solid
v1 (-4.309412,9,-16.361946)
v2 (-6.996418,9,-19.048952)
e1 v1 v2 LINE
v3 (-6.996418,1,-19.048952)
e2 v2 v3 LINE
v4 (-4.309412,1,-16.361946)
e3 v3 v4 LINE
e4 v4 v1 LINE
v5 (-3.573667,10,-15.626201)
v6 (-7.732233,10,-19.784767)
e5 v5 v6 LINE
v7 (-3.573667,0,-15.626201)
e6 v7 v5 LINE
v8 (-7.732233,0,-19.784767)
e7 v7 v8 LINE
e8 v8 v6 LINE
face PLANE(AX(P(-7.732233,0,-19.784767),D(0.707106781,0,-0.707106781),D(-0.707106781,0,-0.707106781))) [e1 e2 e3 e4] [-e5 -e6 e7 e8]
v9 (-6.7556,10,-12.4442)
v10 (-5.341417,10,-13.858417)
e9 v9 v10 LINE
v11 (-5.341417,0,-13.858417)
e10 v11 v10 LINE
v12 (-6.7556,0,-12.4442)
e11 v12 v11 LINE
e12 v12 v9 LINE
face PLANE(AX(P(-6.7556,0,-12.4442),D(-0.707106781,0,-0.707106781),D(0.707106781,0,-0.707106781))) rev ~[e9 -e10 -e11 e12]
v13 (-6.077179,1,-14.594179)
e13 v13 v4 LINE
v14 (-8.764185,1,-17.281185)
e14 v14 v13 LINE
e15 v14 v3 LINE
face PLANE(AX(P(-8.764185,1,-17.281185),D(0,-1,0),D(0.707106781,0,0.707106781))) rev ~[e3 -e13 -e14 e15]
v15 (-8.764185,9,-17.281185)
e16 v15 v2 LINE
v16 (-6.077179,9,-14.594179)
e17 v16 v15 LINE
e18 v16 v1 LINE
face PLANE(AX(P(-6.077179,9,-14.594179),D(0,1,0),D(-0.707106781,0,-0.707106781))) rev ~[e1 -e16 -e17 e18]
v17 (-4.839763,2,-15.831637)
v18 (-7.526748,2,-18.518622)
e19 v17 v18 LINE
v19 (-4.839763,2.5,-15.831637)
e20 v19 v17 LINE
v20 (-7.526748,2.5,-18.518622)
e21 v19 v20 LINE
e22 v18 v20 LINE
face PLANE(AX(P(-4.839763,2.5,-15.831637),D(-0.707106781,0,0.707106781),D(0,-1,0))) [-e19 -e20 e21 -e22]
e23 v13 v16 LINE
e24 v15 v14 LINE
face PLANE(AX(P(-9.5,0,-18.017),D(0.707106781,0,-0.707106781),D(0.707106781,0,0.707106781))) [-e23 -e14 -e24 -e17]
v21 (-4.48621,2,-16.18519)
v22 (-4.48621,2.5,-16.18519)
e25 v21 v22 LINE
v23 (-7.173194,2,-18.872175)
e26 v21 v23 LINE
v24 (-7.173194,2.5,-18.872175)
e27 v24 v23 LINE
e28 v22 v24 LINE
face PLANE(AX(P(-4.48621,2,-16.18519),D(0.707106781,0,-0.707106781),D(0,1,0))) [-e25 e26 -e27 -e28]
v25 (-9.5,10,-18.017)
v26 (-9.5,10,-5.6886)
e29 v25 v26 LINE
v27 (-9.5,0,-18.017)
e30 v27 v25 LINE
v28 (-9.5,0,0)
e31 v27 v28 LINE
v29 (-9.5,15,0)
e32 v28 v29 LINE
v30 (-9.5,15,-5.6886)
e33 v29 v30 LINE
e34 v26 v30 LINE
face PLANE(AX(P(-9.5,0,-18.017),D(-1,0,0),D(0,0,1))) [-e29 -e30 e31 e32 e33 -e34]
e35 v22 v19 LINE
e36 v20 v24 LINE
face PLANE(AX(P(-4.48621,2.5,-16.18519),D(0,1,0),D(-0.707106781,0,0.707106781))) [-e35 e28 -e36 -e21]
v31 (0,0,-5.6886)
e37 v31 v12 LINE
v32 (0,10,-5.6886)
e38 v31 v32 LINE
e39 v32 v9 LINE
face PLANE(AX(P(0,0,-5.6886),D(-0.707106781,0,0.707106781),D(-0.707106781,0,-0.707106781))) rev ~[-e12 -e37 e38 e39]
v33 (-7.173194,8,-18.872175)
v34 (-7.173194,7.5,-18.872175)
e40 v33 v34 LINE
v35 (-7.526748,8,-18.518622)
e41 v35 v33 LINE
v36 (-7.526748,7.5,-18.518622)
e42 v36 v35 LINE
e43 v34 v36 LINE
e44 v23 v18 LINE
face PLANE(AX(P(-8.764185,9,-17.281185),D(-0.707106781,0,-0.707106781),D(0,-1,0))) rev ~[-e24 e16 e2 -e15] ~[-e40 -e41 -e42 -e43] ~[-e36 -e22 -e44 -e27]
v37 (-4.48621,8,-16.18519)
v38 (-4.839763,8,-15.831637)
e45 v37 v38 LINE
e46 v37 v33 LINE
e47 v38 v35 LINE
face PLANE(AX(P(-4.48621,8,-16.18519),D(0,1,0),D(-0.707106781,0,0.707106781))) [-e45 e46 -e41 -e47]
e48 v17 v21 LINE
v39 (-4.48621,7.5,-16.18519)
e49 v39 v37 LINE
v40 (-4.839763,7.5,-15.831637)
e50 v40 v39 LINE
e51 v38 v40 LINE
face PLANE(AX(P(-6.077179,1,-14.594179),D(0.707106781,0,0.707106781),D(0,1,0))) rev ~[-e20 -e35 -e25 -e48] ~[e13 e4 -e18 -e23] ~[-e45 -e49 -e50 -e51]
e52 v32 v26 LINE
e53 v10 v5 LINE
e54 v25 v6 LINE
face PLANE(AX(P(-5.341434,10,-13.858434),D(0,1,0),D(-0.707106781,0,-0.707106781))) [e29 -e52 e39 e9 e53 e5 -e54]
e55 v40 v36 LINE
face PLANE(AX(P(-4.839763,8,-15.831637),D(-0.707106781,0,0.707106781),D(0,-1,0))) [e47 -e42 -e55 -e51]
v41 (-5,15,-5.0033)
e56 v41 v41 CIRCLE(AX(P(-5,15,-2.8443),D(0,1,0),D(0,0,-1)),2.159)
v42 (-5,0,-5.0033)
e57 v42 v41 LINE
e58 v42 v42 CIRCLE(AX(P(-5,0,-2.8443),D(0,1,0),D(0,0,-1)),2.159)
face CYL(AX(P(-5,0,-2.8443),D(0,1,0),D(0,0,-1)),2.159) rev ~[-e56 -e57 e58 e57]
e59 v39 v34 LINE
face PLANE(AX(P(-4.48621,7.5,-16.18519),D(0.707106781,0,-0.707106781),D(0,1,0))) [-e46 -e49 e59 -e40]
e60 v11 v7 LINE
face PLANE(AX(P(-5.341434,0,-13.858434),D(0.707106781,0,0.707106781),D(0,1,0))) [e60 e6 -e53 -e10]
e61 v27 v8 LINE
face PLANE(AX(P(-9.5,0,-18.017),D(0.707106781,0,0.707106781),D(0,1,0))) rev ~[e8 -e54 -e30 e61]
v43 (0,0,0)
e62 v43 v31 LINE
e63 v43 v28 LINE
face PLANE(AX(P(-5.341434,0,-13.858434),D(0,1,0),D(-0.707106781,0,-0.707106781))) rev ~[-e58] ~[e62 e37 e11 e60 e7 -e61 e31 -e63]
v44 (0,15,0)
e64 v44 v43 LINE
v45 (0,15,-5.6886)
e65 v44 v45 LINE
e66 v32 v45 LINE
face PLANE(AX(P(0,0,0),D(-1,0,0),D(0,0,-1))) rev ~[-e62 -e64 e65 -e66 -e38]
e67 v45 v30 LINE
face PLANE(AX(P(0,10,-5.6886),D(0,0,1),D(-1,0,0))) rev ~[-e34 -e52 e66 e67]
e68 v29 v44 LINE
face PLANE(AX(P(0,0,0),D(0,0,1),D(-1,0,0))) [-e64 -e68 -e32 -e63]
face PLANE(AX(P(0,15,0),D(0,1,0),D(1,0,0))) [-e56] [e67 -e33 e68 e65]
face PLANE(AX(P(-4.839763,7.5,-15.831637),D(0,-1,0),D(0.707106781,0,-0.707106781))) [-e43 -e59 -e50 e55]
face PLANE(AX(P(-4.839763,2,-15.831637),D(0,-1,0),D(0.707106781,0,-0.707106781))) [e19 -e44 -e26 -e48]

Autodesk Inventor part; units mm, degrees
ref_plane "YZ Plane" through (0, 0, 0) normal (1, 0, 0) x (0, 1, 0)
ref_plane "XZ Plane" through (0, 0, 0) normal (0, 1, 0) x (-1, 0, 0)
ref_plane "XY Plane" through (0, 0, 0) normal (0, 0, 1) x (1, 0, 0)
sketch "Sketch1" plane through (0, 0, 0) normal (0, 1, 0) x (-1, 0, 0)
  line L0 (0, -5.6886) -> (6.7556, -12.4442)
  line L1 (6.7556, -12.4442) -> (5.3414, -13.8584)
  line L2 (9.5, -18.017) -> (5.3414, -13.8584)
  line L3 (10, -18.017) -> (9.5, -18.017)
  line L4 (10, -18.017) -> (10, 0)
  line L5 (0, 0) -> (10, 0)
  line L6 (0, 0) -> (0, -5.6886)
  circle A0 centre (5, -2.8443) radius 1.339
extrude "Extrusion1" add sketch "Sketch1" along normal blind 10
sketch "Sketch2" plane through (0, 10, 0) normal (0, 1, 0) x (1, 0, 0)
  line L0 (0, 5.6886) -> (-10, 5.6886)
  line L1 (-10, 5.6886) -> (-10, 0)
  line L2 (-10, 0) -> (0, 0)
  line L3 (0, 0) -> (0, 5.6886)
extrude "Extrusion2" add sketch "Sketch2" along normal blind 20
sketch "Sketch3" plane through (0, 0, 0) normal (0, -1, 0) x (1, 0, 0)
  circle A0 centre (-5, -2.8443) radius 1.339 projected
hole "Hole1" at (-5, 0, -2.8443) direction (0, 1, 0) diameter 4.318 end through all
sketch "Sketch8" plane through (-9.5, 0, -18.017) normal (0.7071068, 0, -0.7071068) x (-0.7071068, 0, -0.7071068)
  line L0 (-5.8811, 0) -> (0, 0) projected
  line L1 (0, 0) -> (0, 10) projected
  line L2 (-5.8811, 10) -> (0, 10) projected
  line L3 (-5.8811, 0) -> (-5.8811, 10) projected
  line L4 (-1.0406, 1) -> (-4.8406, 1)
  line L5 (-4.8406, 1) -> (-4.8406, 9)
  line L6 (-4.8406, 9) -> (-1.0406, 9)
  line L7 (-1.0406, 9) -> (-1.0406, 1)
  line L8 (-1.0406, 1) -> (-4.8406, 9) construction
  line L9 (-4.8406, 1) -> (-1.0406, 9) construction
  point P0 (-19.4575, 0)
  point P1 (-2.9406, 5)
  dimension "d41" = 3.8
  dimension "d42" = 8
extrude "Extrusion6" add sketch "Sketch8" along normal blind 2.5
sketch "Sketch9" plane through (-6.0772, 1, -14.5942) normal (-0.7071068, 0, -0.7071068) x (-0.7071068, 0, 0.7071068)
  line L0 (-2.25, 7) -> (-1.75, 7)
  line L1 (-1.75, 7) -> (-1.75, 6.5)
  line L2 (-1.75, 6.5) -> (-2.25, 6.5)
  line L3 (-2.25, 6.5) -> (-2.25, 7)
  line L4 (-1.75, 1) -> (-2.25, 1)
  line L5 (-2.25, 1) -> (-2.25, 1.5)
  line L6 (-2.25, 1.5) -> (-1.75, 1.5)
  line L7 (-1.75, 1.5) -> (-1.75, 1)
  point P0 (6.0224, -1)
  dimension "d45" = 0.5
  dimension "d46" = 0.5
  dimension "d47" = 0.5
  dimension "d48" = 0.5
extrude "Extrusion7" add sketch "Sketch9" along normal blind 4
sketch "Sketch10" plane through (0, 30, 0) normal (0, 1, 0) x (1, 0, 0)
  circle A0 centre (-5, 2.8443) radius 2.159 projected
  line L0 (0, 5.6886) -> (-10, 5.6886) projected
  line L1 (-10, 5.6886) -> (-10, 0) projected
  line L2 (-10, 0) -> (0, 0) projected
  line L3 (0, 0) -> (0, 5.6886) projected
extrude "Extrusion8" cut sketch "Sketch10" against normal blind 15
sketch "Sketch11" plane through (-10, 0, -18.017) normal (-1, 0, 0) x (0, 0, 1)
  line L0 (18.017, 15) -> (12.3284, 15) projected
  line L1 (12.3284, 10) -> (12.3284, 15) projected
  line L2 (0, 10) -> (12.3284, 10) projected
  line L3 (0, 0) -> (0, 10) projected
  line L4 (0, 0) -> (18.017, 0) projected
  line L5 (18.017, 0) -> (18.017, 15) projected
extrude "Extrusion9" cut sketch "Sketch11" against normal blind 0.5
sketch "Sketch12" plane through (-6.0772, 1, -14.5942) normal (0.7071068, 0, -0.7071068) x (-0.7071068, 0, -0.7071068)
  line L0 (0, 8) -> (0, 0) projected
  line L1 (0, 0) -> (3.8, 0) projected
  line L2 (3.8, 0) -> (3.8, 8) projected
  line L3 (3.8, 8) -> (0, 8) projected
  point P0 (-14.6169, -1)
sketch "Sketch13" plane through (-7.7322, 0, -19.7848) normal (0.7071068, 0, -0.7071068) x (-0.7071068, 0, -0.7071068)
  line L0 (-4.8406, 1) -> (-4.8406, 9) projected
  line L1 (-4.8406, 9) -> (-1.0406, 9) projected
  line L2 (-1.0406, 9) -> (-1.0406, 1) projected
  line L3 (-1.0406, 1) -> (-4.8406, 1) projected
  line L4 (-5.8811, 0) -> (0, 0) projected
  line L5 (0, 0) -> (0, 10) projected
  line L6 (0, 10) -> (-5.8811, 10) projected
  line L7 (-5.8811, 10) -> (-5.8811, 0) projected
  circle A0 centre (-2.9406, 5) radius 0.2694
  point P0 (-19.4575, 0)
properties part number "TensionMount"
